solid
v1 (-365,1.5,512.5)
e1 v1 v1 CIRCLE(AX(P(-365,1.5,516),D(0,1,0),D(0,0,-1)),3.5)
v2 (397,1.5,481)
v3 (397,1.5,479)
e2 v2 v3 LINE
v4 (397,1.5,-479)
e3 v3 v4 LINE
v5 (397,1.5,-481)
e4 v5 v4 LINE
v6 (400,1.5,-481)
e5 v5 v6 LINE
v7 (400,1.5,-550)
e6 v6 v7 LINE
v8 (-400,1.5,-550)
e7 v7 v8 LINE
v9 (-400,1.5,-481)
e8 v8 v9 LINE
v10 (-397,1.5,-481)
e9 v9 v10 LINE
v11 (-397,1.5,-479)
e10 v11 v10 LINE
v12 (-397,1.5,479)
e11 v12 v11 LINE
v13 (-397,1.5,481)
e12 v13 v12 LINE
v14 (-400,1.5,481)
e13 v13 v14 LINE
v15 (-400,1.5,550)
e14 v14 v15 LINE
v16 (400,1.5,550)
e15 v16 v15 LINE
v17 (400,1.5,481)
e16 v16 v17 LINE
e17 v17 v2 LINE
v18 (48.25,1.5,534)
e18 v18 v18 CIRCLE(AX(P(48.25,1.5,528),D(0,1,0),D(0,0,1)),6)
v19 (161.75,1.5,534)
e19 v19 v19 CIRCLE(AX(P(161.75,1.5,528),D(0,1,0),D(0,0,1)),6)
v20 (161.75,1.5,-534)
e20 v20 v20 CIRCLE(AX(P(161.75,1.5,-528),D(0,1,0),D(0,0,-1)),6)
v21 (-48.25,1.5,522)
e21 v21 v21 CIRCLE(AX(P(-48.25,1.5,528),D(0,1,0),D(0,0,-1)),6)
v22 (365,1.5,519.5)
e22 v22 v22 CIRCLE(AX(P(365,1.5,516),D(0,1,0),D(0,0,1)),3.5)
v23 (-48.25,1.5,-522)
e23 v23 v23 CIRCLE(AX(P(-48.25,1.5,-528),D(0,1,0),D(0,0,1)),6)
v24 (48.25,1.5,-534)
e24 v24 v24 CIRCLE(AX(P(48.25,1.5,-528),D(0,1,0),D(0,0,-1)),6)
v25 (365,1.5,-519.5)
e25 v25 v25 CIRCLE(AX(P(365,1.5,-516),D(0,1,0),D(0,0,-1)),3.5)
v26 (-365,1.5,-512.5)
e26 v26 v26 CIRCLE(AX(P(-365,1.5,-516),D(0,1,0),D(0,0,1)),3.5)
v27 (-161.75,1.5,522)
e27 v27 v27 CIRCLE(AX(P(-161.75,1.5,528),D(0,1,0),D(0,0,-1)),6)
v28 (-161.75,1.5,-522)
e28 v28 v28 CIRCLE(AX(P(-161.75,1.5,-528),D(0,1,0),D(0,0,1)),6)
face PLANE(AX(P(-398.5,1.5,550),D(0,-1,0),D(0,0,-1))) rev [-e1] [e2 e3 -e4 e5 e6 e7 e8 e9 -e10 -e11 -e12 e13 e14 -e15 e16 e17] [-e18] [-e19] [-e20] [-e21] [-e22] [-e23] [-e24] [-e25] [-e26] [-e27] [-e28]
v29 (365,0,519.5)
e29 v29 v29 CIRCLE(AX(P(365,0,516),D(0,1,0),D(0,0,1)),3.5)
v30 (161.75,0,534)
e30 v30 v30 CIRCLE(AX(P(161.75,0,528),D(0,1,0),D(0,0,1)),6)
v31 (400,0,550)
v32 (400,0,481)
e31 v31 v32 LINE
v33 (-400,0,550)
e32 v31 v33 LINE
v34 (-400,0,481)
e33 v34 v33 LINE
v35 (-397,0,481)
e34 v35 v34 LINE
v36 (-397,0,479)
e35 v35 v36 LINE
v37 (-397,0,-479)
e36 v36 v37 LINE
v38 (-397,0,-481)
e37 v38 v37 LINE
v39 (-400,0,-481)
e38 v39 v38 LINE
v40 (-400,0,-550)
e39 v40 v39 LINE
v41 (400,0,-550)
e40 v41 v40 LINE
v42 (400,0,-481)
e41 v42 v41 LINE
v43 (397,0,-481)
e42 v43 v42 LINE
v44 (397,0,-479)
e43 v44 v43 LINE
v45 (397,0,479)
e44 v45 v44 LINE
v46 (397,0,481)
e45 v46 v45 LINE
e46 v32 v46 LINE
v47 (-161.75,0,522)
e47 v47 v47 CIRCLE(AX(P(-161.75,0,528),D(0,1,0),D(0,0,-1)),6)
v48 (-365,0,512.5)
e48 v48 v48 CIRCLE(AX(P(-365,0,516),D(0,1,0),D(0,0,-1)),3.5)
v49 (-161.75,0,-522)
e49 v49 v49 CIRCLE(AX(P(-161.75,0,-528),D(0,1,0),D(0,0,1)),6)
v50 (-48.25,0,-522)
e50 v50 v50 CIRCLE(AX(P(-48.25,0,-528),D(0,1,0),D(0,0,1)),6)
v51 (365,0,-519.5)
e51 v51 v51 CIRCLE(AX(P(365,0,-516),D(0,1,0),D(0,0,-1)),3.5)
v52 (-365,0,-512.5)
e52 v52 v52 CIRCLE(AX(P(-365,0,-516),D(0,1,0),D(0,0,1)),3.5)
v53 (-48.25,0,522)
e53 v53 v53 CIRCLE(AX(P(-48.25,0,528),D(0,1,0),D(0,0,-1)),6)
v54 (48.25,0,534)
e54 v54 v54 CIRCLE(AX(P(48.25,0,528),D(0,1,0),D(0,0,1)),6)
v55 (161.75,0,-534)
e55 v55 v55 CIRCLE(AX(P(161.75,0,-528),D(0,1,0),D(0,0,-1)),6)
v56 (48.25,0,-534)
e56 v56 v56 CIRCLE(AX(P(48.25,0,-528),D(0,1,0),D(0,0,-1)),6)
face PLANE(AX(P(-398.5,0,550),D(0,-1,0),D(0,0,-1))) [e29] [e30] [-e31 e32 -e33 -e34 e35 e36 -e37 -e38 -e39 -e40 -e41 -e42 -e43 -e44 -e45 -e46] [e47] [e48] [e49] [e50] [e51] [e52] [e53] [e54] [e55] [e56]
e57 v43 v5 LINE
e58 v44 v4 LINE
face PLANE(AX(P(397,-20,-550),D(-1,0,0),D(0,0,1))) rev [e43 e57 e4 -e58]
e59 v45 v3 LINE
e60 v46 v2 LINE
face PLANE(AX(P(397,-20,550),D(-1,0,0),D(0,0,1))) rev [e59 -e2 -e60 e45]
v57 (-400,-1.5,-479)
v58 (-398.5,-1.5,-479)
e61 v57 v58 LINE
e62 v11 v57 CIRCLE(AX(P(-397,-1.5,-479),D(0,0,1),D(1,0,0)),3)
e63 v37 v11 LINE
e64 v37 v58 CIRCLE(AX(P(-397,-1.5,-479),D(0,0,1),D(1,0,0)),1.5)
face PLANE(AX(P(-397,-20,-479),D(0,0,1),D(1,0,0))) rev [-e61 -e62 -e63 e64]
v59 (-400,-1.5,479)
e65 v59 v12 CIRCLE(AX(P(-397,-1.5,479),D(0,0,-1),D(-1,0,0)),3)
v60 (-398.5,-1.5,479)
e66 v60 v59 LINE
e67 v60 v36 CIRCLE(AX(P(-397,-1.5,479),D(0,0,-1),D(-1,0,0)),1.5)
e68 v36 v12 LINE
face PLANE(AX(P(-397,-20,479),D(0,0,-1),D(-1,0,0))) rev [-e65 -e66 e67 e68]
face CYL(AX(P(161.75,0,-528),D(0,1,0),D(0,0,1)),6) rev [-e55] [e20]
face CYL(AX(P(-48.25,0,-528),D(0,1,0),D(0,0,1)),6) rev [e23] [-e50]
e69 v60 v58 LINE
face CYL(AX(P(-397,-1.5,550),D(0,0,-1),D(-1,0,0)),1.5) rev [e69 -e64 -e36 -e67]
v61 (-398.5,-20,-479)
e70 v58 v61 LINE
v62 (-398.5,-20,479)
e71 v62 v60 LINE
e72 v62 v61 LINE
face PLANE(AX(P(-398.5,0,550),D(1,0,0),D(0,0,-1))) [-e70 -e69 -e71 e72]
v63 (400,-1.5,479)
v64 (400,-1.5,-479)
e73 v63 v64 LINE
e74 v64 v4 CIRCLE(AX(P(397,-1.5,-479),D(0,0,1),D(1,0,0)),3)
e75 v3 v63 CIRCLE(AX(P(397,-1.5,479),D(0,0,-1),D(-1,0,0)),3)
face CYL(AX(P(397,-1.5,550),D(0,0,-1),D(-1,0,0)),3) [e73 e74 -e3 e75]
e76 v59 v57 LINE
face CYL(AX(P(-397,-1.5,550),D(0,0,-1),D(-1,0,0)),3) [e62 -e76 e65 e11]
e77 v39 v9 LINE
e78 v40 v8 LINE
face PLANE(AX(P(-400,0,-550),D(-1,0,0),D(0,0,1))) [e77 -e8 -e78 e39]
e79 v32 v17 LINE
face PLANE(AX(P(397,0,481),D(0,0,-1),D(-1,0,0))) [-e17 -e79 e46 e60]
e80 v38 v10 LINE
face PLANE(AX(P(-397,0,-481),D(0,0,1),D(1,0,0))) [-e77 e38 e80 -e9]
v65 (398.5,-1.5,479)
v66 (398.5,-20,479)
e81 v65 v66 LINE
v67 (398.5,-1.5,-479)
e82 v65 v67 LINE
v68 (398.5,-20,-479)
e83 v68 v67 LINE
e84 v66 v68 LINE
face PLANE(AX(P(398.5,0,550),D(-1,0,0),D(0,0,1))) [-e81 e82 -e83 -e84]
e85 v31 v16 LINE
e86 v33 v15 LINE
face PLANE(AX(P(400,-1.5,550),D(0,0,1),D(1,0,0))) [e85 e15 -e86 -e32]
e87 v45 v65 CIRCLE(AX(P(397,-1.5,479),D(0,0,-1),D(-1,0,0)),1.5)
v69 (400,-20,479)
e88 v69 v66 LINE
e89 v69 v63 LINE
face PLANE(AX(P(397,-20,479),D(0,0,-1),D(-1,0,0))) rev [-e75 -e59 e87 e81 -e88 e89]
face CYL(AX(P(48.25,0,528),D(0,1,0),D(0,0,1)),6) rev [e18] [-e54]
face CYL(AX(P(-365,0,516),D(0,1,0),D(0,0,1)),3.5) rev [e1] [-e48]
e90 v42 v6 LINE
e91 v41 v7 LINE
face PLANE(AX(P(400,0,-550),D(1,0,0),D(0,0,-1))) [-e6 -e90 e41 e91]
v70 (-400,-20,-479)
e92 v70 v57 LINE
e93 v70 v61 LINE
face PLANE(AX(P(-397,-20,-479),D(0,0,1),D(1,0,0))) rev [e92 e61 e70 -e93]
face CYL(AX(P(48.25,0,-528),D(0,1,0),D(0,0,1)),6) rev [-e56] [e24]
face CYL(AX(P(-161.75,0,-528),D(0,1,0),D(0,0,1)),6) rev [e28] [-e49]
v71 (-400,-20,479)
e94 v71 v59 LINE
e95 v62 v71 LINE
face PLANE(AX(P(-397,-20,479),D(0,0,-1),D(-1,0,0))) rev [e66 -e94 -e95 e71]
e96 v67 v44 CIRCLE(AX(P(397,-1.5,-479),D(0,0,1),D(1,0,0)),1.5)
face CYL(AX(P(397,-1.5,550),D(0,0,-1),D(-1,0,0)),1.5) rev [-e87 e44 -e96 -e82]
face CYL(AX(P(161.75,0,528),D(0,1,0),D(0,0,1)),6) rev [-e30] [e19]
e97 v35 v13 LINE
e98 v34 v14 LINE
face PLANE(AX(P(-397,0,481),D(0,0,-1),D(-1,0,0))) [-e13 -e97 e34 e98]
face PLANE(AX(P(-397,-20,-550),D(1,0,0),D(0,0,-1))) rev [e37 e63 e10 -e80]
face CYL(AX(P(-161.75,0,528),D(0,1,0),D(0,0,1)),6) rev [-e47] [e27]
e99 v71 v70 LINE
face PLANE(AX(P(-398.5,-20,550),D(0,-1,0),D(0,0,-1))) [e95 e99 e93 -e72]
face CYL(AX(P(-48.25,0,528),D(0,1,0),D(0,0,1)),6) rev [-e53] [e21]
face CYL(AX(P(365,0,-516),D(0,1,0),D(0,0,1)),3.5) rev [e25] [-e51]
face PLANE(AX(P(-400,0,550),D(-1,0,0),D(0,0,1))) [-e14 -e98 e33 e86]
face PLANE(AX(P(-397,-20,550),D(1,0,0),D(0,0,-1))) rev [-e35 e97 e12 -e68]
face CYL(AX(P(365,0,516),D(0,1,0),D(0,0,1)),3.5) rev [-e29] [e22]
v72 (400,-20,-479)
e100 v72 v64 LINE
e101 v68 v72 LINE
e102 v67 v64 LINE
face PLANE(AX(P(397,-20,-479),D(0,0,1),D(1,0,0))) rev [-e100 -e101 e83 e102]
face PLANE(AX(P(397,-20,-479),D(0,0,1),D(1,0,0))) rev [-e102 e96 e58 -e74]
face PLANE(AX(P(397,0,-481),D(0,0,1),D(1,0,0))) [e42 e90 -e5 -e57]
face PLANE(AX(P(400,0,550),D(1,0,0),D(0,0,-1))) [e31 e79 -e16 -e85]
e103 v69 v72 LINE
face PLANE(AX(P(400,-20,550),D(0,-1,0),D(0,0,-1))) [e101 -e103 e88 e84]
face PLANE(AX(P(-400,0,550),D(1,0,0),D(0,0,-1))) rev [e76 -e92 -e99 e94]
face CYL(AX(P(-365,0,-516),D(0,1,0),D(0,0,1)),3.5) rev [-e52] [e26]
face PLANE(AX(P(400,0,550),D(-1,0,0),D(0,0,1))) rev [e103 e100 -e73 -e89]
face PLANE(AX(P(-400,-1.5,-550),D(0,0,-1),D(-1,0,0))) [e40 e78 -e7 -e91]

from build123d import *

# Parameters (mm, degrees)
SM_BASE_FLANGE_1_DEPTH   = 550
SKETCH_6_W               = 3
SKETCH_6_H               = 71
CUT_EXTRUDE_1_DEPTH      = 681.413293521
SKETCH_7_W               = 3
SKETCH_7_H               = 69
SM_BASE_FLANGE_1_2_DEPTH = 1.5
SKETCH_10_R              = 3.5
CUT_EXTRUDE_2_DEPTH      = 10
SKETCH_11_R              = 6
CUT_EXTRUDE_1853_DEPTH   = 10


# Sheet-metal steps are written as plain solids
with BuildPart() as part:
    # Sketch 1 → Sm Base Flange 1 (new, symmetric)
    with BuildSketch(Plane.XY):
        with BuildLine():
            Line((-398.5, -20), (-398.5, -1.5))
            ThreePointArc((-398.5, -1.5), (-398.060660172, -0.439339828), (-397, 0))
            Line((-397, 0), (397, 0))
            ThreePointArc((397, 0), (398.060660172, -0.439339828), (398.5, -1.5))
            Line((398.5, -1.5), (398.5, -20))
            Line((398.5, -20), (400, -20))
            Line((400, -20), (400, -1.5))
            ThreePointArc((400, -1.5), (399.121320344, 0.621320344), (397, 1.5))
            Line((397, 1.5), (-397, 1.5))
            ThreePointArc((-397, 1.5), (-399.121320344, 0.621320344), (-400, -1.5))
            Line((-400, -1.5), (-400, -20))
            Line((-400, -20), (-398.5, -20))
        make_face()
    extrude(amount=SM_BASE_FLANGE_1_DEPTH, both=True)

    # Эскиз6 → Вырез-Вытянуть1 (cut, through all)
    with BuildSketch(Plane(origin=(0, 1.5, 0), x_dir=(1, 0, 0), z_dir=(0, 1, 0))):
        with Locations((398.5, -514.5)):
            Rectangle(SKETCH_6_W, SKETCH_6_H)
        with Locations((398.5, 514.5)):
            Rectangle(SKETCH_6_W, SKETCH_6_H)
        with Locations((-398.5, 514.5)):
            Rectangle(SKETCH_6_W, SKETCH_6_H)
        with Locations((-398.5, -514.5)):
            Rectangle(SKETCH_6_W, SKETCH_6_H)
    extrude(amount=-CUT_EXTRUDE_1_DEPTH, mode=Mode.SUBTRACT)

    # Эскиз7 → Sm Base Flange 1 2 (add)
    with BuildSketch(Plane(origin=(0, 1.5, 0), x_dir=(1, 0, 0), z_dir=(0, 1, 0))):
        with Locations((398.5, -515.5)):
            Rectangle(SKETCH_7_W, SKETCH_7_H)
        with Locations((398.5, 515.5)):
            Rectangle(SKETCH_7_W, SKETCH_7_H)
        with Locations((-398.5, 515.5)):
            Rectangle(SKETCH_7_W, SKETCH_7_H)
        with Locations((-398.5, -515.5)):
            Rectangle(SKETCH_7_W, SKETCH_7_H)
    extrude(amount=-SM_BASE_FLANGE_1_2_DEPTH)

    # Эскиз10 → Вырез-Вытянуть2 (cut)
    with BuildSketch(Plane(origin=(0, 1.5, 0), x_dir=(1, 0, 0), z_dir=(0, 1, 0))):
        with Locations(Location((365, -516, 0), (0, 0, 270))):
            Circle(SKETCH_10_R)
        with Locations(Location((365, 516, 0), (0, 0, 90))):
            Circle(SKETCH_10_R)
        with Locations(Location((-365, 516, 0), (0, 0, 270))):
            Circle(SKETCH_10_R)
        with Locations(Location((-365, -516, 0), (0, 0, 90))):
            Circle(SKETCH_10_R)
    extrude(amount=-CUT_EXTRUDE_2_DEPTH, mode=Mode.SUBTRACT)

    # Эскиз11 → Cut-Extrude 1853 (cut)
    with BuildSketch(Plane(origin=(0, 1.5, 0), x_dir=(1, 0, 0), z_dir=(0, 1, 0))):
        with Locations(Location((161.75, -528, 0), (0, 0, 270))):
            Circle(SKETCH_11_R)
        with Locations(Location((48.25, -528, 0), (0, 0, 270))):
            Circle(SKETCH_11_R)
        with Locations(Location((48.25, 528, 0), (0, 0, 90))):
            Circle(SKETCH_11_R)
        with Locations(Location((161.75, 528, 0), (0, 0, 90))):
            Circle(SKETCH_11_R)
        with Locations(Location((-161.75, 528, 0), (0, 0, 270))):
            Circle(SKETCH_11_R)
        with Locations(Location((-48.25, 528, 0), (0, 0, 270))):
            Circle(SKETCH_11_R)
        with Locations(Location((-48.25, -528, 0), (0, 0, 90))):
            Circle(SKETCH_11_R)
        with Locations(Location((-161.75, -528, 0), (0, 0, 90))):
            Circle(SKETCH_11_R)
    extrude(amount=-CUT_EXTRUDE_1853_DEPTH, mode=Mode.SUBTRACT)


solid = part.part
